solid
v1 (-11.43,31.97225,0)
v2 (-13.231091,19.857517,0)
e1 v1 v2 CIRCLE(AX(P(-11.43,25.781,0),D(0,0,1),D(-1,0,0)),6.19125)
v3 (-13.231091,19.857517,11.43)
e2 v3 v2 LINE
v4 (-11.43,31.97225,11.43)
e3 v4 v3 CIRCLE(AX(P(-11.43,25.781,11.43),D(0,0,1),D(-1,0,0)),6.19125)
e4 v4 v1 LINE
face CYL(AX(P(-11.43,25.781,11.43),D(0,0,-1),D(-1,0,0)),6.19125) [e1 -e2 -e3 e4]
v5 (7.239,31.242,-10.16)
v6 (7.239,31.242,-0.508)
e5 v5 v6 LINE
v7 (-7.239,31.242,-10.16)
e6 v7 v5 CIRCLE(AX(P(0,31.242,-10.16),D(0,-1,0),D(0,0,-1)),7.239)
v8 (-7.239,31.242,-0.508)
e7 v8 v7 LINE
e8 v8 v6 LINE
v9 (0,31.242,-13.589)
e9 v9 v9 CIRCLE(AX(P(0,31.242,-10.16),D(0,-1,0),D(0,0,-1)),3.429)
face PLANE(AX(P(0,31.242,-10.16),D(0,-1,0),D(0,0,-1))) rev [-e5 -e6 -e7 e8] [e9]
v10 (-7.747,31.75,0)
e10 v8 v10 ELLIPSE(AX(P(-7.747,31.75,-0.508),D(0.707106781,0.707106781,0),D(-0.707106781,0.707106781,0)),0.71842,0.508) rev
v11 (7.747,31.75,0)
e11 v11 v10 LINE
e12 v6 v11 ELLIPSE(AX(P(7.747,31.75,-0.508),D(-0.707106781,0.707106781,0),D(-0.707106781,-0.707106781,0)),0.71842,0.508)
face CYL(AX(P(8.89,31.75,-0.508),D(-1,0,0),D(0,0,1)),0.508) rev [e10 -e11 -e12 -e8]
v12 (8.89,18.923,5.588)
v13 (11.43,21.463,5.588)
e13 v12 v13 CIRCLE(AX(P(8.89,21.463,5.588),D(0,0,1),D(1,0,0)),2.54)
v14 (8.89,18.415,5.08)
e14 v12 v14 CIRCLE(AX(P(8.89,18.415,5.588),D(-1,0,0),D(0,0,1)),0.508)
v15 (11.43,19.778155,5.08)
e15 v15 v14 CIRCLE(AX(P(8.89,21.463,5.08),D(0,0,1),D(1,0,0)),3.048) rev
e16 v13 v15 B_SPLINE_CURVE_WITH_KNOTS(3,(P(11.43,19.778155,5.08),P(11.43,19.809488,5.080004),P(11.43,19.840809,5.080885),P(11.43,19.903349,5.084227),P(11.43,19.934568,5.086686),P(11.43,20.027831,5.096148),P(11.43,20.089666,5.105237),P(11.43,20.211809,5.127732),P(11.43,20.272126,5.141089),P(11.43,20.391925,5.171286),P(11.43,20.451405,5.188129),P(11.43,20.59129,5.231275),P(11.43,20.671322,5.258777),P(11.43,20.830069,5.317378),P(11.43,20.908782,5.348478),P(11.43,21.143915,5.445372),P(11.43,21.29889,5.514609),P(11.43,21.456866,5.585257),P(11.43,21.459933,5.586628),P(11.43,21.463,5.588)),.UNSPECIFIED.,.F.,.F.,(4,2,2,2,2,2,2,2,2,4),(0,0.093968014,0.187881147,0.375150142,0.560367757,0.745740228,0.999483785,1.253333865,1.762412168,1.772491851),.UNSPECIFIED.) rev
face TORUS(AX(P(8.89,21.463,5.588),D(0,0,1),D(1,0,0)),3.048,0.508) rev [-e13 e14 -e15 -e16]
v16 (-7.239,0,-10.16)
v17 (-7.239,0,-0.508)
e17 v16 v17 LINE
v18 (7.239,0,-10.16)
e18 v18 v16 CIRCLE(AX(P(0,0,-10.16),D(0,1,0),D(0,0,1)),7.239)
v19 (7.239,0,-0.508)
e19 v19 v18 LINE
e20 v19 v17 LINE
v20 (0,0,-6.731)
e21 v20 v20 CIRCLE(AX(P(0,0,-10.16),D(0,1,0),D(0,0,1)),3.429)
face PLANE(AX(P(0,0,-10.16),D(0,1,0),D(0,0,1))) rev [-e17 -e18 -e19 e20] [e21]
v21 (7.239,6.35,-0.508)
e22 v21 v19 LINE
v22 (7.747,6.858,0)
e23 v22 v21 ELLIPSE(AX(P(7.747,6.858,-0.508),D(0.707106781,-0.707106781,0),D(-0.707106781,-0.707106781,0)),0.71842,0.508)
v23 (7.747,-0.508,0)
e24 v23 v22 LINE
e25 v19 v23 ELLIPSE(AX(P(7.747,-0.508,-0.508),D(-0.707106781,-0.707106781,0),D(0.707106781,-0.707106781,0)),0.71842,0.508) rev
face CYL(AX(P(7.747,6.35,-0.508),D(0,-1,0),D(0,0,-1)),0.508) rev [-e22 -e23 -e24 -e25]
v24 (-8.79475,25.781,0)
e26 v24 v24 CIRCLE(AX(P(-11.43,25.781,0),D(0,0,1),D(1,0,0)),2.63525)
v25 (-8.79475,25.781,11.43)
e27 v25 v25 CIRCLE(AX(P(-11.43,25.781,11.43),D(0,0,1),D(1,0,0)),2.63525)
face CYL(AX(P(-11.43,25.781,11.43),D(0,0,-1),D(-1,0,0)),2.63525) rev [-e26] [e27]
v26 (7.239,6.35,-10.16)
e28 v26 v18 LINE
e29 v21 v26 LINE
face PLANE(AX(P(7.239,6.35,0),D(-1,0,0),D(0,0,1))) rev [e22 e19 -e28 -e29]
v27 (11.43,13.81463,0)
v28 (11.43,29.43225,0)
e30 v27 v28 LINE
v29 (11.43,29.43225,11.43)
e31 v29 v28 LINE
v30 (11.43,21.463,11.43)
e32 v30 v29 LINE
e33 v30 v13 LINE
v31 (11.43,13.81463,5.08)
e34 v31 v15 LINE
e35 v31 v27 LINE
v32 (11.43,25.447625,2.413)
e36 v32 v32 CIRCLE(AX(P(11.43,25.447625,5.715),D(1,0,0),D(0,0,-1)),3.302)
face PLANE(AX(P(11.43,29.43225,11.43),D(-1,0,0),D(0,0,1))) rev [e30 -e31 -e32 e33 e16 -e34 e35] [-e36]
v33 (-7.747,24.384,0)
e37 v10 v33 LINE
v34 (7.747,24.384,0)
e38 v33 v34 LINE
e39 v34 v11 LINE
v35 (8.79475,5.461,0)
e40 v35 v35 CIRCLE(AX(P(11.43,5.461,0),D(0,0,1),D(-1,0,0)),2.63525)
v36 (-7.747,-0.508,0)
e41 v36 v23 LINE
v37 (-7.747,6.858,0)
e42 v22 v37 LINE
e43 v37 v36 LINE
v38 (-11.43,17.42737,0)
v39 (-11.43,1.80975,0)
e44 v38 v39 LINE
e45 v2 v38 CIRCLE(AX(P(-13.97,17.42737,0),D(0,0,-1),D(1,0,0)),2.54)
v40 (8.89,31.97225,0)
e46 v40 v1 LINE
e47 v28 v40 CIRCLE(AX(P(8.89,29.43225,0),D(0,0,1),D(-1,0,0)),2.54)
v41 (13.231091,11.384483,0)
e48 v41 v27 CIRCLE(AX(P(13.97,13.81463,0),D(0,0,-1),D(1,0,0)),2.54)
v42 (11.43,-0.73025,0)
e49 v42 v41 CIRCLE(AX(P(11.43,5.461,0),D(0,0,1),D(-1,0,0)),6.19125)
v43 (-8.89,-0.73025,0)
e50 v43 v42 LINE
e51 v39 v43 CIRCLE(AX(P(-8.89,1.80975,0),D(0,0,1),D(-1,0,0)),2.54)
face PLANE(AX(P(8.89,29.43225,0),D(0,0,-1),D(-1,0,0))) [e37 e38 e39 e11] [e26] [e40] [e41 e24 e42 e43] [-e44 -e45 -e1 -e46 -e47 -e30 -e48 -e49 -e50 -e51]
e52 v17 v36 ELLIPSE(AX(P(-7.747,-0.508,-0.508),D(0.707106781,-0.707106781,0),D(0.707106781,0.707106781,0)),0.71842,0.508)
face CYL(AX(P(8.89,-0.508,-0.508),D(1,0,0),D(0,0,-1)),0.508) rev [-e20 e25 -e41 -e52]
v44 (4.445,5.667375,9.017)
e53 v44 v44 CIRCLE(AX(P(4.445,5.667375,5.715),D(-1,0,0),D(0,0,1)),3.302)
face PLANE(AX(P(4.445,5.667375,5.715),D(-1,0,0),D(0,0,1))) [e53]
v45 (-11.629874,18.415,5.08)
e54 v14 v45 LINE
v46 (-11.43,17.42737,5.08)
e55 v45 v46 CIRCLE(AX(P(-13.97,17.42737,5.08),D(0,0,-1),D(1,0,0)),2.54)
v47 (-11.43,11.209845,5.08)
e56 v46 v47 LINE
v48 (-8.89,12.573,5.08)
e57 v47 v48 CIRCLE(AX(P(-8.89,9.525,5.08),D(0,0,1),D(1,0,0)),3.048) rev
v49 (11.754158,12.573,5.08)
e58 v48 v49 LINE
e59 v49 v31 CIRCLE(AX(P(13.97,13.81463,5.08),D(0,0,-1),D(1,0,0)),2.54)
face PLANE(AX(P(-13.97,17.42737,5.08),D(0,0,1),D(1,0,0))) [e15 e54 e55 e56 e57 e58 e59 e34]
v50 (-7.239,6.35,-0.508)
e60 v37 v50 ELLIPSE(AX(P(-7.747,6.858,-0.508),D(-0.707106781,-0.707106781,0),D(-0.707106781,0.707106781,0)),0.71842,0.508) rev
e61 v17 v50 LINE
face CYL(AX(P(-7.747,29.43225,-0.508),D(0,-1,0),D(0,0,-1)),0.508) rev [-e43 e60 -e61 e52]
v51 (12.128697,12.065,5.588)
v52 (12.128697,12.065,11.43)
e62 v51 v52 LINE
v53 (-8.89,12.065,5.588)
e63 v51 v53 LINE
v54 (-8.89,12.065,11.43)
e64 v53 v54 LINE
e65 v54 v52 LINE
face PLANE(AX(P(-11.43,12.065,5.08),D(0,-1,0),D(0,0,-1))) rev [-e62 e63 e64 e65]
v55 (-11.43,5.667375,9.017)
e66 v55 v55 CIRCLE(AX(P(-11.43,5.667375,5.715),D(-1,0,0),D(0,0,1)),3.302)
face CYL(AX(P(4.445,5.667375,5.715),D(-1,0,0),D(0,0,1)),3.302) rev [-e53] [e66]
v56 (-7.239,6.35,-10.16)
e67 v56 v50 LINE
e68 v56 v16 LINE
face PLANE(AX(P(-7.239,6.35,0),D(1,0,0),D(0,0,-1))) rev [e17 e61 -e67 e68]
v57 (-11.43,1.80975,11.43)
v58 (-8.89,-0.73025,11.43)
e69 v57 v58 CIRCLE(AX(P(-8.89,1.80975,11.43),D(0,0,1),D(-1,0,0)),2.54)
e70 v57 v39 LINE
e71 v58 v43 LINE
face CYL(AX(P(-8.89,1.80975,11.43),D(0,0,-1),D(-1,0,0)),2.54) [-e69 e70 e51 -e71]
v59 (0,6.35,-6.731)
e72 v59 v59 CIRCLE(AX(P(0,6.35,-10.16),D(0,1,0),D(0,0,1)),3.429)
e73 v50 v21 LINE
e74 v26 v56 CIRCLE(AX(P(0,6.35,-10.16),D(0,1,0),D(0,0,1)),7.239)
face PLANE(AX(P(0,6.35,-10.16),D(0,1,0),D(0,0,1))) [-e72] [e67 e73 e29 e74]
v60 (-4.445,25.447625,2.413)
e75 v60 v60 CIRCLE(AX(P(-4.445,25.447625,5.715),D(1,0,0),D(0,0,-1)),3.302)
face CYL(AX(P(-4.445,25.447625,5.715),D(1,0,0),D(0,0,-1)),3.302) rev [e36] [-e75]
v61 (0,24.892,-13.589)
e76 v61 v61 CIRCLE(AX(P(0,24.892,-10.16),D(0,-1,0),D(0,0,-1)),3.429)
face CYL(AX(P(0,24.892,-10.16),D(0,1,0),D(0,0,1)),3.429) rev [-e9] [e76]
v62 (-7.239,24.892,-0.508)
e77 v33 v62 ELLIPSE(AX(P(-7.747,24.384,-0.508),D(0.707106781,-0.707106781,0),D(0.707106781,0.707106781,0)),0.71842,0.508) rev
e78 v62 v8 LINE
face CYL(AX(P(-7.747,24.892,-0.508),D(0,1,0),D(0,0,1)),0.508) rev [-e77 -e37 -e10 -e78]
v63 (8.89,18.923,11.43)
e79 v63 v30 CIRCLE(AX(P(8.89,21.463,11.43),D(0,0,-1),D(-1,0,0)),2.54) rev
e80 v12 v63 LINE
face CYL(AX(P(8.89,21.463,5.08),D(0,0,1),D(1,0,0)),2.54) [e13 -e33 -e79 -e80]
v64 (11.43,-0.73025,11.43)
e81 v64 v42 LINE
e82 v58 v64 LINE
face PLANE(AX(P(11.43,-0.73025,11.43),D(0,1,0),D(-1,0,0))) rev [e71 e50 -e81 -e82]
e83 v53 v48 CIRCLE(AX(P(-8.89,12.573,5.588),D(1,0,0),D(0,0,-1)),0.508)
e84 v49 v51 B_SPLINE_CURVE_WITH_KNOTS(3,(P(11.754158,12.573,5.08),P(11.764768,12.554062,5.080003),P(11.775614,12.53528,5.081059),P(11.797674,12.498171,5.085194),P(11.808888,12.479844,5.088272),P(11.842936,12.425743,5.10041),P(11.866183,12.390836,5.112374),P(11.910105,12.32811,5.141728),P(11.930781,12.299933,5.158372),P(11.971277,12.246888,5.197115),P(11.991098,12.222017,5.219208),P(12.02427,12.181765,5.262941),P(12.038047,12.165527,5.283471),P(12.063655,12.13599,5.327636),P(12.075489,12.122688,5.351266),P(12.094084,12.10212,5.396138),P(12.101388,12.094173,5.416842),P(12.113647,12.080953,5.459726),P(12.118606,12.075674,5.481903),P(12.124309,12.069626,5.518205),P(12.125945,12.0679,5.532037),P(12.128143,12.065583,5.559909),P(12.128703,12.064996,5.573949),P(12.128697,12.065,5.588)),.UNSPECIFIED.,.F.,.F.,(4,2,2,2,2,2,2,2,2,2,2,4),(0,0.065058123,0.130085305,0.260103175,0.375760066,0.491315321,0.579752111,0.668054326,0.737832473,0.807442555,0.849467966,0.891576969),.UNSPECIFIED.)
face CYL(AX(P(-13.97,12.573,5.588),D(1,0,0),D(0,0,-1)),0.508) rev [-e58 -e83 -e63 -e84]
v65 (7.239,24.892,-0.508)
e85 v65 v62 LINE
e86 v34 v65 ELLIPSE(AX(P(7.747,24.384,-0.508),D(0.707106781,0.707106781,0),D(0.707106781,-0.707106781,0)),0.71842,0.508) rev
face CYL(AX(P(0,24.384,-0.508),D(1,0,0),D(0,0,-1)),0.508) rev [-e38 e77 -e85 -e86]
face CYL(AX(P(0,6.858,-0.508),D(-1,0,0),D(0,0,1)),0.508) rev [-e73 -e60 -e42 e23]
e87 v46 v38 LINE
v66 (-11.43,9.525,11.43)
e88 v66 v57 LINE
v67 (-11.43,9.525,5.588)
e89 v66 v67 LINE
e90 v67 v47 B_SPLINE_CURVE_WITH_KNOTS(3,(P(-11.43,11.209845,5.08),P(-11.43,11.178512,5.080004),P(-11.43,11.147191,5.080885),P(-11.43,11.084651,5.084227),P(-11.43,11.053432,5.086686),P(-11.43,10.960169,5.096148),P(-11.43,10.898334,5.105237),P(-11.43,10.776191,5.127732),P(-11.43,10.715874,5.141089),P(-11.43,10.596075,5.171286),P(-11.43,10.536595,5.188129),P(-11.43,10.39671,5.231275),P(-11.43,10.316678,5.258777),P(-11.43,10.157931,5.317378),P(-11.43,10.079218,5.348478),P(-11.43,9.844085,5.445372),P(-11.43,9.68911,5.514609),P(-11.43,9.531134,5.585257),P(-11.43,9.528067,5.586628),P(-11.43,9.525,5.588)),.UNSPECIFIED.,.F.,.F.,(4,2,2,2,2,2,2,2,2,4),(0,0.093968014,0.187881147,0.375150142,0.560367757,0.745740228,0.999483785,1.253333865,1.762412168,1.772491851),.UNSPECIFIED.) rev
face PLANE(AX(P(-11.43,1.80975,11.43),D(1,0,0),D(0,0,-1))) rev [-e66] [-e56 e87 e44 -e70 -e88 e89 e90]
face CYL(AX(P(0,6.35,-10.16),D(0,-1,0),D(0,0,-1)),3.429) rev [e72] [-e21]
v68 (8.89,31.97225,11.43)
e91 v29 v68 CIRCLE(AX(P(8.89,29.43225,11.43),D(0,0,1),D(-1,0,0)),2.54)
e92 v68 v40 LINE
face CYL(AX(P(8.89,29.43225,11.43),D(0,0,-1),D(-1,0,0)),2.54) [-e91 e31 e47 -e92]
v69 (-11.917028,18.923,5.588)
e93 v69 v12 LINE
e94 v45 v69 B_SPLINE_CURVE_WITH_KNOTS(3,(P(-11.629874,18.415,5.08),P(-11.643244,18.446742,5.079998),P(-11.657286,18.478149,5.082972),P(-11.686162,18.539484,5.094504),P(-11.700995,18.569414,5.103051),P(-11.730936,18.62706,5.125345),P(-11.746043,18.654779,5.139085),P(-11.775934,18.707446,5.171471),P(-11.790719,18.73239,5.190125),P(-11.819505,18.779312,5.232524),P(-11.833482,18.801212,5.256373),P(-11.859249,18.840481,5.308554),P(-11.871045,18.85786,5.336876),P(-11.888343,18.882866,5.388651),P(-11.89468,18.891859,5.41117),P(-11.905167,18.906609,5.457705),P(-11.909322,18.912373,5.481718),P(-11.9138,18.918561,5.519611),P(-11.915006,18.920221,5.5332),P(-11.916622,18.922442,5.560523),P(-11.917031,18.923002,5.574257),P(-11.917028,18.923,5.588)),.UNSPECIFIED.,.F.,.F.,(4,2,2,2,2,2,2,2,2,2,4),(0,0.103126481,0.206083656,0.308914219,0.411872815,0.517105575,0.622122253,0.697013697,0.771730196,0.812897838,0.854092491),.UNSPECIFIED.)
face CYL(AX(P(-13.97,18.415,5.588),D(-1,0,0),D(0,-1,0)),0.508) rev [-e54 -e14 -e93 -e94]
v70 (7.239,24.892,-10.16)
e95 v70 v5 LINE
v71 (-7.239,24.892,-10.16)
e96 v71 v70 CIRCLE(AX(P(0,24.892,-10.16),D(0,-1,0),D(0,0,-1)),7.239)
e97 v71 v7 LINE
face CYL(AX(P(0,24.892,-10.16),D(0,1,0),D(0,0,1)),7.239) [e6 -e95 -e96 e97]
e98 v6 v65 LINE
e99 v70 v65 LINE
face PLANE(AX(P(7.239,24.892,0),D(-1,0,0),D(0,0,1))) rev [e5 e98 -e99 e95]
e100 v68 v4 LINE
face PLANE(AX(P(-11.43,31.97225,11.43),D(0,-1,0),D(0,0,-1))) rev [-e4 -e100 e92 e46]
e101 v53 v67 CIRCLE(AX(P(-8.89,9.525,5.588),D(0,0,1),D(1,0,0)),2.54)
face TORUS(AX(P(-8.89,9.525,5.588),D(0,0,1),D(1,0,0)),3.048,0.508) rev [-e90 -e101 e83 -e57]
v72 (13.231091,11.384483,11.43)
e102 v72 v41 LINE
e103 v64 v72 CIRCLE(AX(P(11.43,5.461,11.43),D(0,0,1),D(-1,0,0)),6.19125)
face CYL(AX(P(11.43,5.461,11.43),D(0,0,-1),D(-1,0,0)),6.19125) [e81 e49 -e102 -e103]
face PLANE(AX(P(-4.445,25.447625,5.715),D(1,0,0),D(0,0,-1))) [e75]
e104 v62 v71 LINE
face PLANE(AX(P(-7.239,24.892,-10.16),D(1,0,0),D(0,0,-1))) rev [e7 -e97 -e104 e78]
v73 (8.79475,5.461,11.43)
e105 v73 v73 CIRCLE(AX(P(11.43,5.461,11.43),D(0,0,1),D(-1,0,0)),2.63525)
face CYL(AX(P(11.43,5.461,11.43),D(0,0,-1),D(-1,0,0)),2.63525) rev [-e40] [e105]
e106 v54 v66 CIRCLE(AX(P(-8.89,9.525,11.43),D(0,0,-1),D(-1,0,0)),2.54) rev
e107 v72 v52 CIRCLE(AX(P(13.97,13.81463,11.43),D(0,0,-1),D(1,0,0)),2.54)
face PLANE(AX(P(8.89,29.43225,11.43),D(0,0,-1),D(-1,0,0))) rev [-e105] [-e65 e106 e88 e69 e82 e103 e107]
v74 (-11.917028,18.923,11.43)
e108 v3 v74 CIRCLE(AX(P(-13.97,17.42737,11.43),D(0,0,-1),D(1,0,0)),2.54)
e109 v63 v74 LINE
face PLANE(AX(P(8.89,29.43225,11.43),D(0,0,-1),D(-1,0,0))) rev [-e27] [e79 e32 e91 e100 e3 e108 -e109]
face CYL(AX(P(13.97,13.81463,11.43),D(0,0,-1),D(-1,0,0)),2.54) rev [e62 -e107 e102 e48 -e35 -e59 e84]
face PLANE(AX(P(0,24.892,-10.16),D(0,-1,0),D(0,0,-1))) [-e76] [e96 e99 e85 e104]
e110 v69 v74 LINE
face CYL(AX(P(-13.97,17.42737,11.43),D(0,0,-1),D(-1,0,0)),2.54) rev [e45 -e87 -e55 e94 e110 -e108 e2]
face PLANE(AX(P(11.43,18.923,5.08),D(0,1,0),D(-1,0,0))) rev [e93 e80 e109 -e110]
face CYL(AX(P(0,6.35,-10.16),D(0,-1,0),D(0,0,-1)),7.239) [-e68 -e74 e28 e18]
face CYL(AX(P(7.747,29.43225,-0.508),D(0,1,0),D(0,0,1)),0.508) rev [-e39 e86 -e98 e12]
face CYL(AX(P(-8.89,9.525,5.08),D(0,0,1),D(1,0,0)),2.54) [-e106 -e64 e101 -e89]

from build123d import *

# Parameters (mm, degrees)
SKETCH2_R           = 3.429
BOSS_EXTRUDE1_DEPTH = 6.35
SKETCH6_R           = 3.429
BOSS_EXTRUDE2_DEPTH = 6.35
SKETCH7_R           = 2.63525
BOSS_EXTRUDE3_DEPTH = 11.43
CUT_EXTRUDE2_START  = -6.35
CUT_EXTRUDE2_DEPTH  = 6.35
FILLET2_R           = 2.54
FILLET3_R           = 0.508
SKETCH12_R          = 3.302
CUT_EXTRUDE3_DEPTH  = 15.875
SKETCH13_R          = 3.302
CUT_EXTRUDE4_DEPTH  = 15.875


with BuildPart() as part:
    # Sketch2 → Boss-Extrude1 (new body)
    with BuildSketch(Plane(origin=(0, 0, 0), x_dir=(1, 0, 0), z_dir=(0, 1, 0))):
        with BuildLine():
            Line((-7.239, 0), (-7.239, 10.16))
            ThreePointArc((-7.239, 10.16), (0, 17.399), (7.239, 10.16))
            Line((7.239, 10.16), (7.239, 0))
            Line((7.239, 0), (-7.239, 0))
        make_face()
        with Locations(Location((0, 10.16, 0), (0, 0, 270))):
            Circle(SKETCH2_R, mode=Mode.SUBTRACT)
    extrude(amount=BOSS_EXTRUDE1_DEPTH)



with BuildPart() as body_2:
    # Sketch6 → Boss-Extrude2 (new body)
    with BuildSketch(Plane(origin=(0, 31.242, 0), x_dir=(-1, 0, 0), z_dir=(0, -1, 0))):
        with BuildLine():
            Line((7.239, 0), (-7.239, 0))
            Line((-7.239, 0), (-7.239, 10.16))
            ThreePointArc((-7.239, 10.16), (0, 17.399), (7.239, 10.16))
            Line((7.239, 10.16), (7.239, 0))
        make_face()
        with Locations(Location((0, 10.16, 0), (0, 0, 270))):
            Circle(SKETCH6_R, mode=Mode.SUBTRACT)
    extrude(amount=BOSS_EXTRUDE2_DEPTH)


with BuildPart() as part_1:
    add(part.part)

    add(body_2.part)  # Boss-Extrude3 merges body 2
    # Sketch7 → Boss-Extrude3 (add)
    with BuildSketch(Plane.XY):
        with BuildLine():
            Line((11.43, -0.73025), (-8.89, -0.73025))
            ThreePointArc((-8.89, -0.73025), (-10.686051224, 0.013698776), (-11.43, 1.80975))
            Line((-11.43, 1.80975), (-11.43, 17.427370456))
            ThreePointArc((-11.43, 17.427370456), (-11.929359281, 18.939780934), (-13.231090909, 19.857517232))
            ThreePointArc((-13.231090909, 19.857517232), (-17.553942327, 26.691443265), (-11.43, 31.97225))
            Line((-11.43, 31.97225), (8.89, 31.97225))
            ThreePointArc((8.89, 31.97225), (10.686051224, 31.228301224), (11.43, 29.43225))
            Line((11.43, 29.43225), (11.43, 13.814629544))
            ThreePointArc((11.43, 13.814629544), (11.929359281, 12.302219066), (13.231090909, 11.384482768))
            ThreePointArc((13.231090909, 11.384482768), (17.553942327, 4.550556735), (11.43, -0.73025))
        make_face()
        with Locations((-11.43, 25.781)):
            Circle(SKETCH7_R, mode=Mode.SUBTRACT)
        with Locations(Location((11.43, 5.461, 0), (0, 0, 180))):
            Circle(SKETCH7_R, mode=Mode.SUBTRACT)
    extrude(amount=BOSS_EXTRUDE3_DEPTH)

    # Sketch11 → Cut-Extrude2 (cut)
    with BuildSketch(Plane.XY.offset(11.43).offset(CUT_EXTRUDE2_START)):
        with BuildLine():
            Line((11.43, 18.923), (-11.91702843, 18.923))
            ThreePointArc((-11.91702843, 18.923), (-11.554824252, 18.213834763), (-11.43, 17.427370456))
            Line((-11.43, 17.427370456), (-11.43, 12.065))
            Line((-11.43, 12.065), (12.128697076, 12.065))
            ThreePointArc((12.128697076, 12.065), (11.611132748, 12.872639477), (11.43, 13.814629544))
            Line((11.43, 13.814629544), (11.43, 18.923))
        make_face()
    extrude(amount=CUT_EXTRUDE2_DEPTH, mode=Mode.SUBTRACT)

    # Fillet2
    fillet2_edges = [part_1.edges().sort_by_distance(p)[0] for p in [
        (11.43, 18.923, 8.255),
        (-11.43, 12.065, 8.255),
    ]]
    fillet(fillet2_edges, radius=FILLET2_R)

    # Fillet3
    fillet3_edges = [part_1.edges().sort_by_distance(p)[0] for p in [
        (-10.686051224, 11.321051224, 5.08),
        (1.619348538, 12.065, 5.08),
    ]]
    fillet(fillet3_edges, radius=FILLET3_R)
    fillet3_2_edges = [part_1.edges().sort_by_distance(p)[0] for p in [
        (-1.513514215, 18.923, 5.08),
        (10.686051224, 19.666948776, 5.08),
    ]]
    fillet(fillet3_2_edges, radius=FILLET3_R)
    fillet3_3_edges = [part_1.edges().sort_by_distance(p)[0] for p in [
        (0, 0, 0),
    ]]
    fillet(fillet3_3_edges, radius=FILLET3_R)
    fillet3_4_edges = [part_1.edges().sort_by_distance(p)[0] for p in [
        (0, 6.35, 0),
    ]]
    fillet(fillet3_4_edges, radius=FILLET3_R)
    fillet3_5_edges = [part_1.edges().sort_by_distance(p)[0] for p in [
        (0, 31.242, 0),
    ]]
    fillet(fillet3_5_edges, radius=FILLET3_R)
    fillet3_6_edges = [part_1.edges().sort_by_distance(p)[0] for p in [
        (0, 24.892, 0),
    ]]
    fillet(fillet3_6_edges, radius=FILLET3_R)
    fillet3_7_edges = [part_1.edges().sort_by_distance(p)[0] for p in [
        (7.239, 28.067, 0),
    ]]
    fillet(fillet3_7_edges, radius=FILLET3_R)
    fillet3_8_edges = [part_1.edges().sort_by_distance(p)[0] for p in [
        (-7.239, 28.067, 0),
    ]]
    fillet(fillet3_8_edges, radius=FILLET3_R)
    fillet3_9_edges = [part_1.edges().sort_by_distance(p)[0] for p in [
        (7.239, 3.175, 0),
    ]]
    fillet(fillet3_9_edges, radius=FILLET3_R - 0.0001)  # a hair under: the kernel refuses the full size
    fillet3_10_edges = [part_1.edges().sort_by_distance(p)[0] for p in [
        (-7.239, 3.175, 0),
    ]]
    fillet(fillet3_10_edges, radius=FILLET3_R - 0.0001)  # a hair under: the kernel refuses the full size

    # Sketch12 → Cut-Extrude3 (cut)
    with BuildSketch(Plane(origin=(11.43, 0, 0), x_dir=(0, 0, -1), z_dir=(1, 0, 0))):
        with Locations((-5.715, 25.447625)):
            Circle(SKETCH12_R)
    extrude(amount=-CUT_EXTRUDE3_DEPTH, mode=Mode.SUBTRACT)

    # Sketch13 → Cut-Extrude4 (cut)
    with BuildSketch(Plane.ZY.offset(11.43)):
        with Locations((5.715, 5.667375)):
            Circle(SKETCH13_R)
    extrude(amount=-CUT_EXTRUDE4_DEPTH, mode=Mode.SUBTRACT)


solid = part_1.part
